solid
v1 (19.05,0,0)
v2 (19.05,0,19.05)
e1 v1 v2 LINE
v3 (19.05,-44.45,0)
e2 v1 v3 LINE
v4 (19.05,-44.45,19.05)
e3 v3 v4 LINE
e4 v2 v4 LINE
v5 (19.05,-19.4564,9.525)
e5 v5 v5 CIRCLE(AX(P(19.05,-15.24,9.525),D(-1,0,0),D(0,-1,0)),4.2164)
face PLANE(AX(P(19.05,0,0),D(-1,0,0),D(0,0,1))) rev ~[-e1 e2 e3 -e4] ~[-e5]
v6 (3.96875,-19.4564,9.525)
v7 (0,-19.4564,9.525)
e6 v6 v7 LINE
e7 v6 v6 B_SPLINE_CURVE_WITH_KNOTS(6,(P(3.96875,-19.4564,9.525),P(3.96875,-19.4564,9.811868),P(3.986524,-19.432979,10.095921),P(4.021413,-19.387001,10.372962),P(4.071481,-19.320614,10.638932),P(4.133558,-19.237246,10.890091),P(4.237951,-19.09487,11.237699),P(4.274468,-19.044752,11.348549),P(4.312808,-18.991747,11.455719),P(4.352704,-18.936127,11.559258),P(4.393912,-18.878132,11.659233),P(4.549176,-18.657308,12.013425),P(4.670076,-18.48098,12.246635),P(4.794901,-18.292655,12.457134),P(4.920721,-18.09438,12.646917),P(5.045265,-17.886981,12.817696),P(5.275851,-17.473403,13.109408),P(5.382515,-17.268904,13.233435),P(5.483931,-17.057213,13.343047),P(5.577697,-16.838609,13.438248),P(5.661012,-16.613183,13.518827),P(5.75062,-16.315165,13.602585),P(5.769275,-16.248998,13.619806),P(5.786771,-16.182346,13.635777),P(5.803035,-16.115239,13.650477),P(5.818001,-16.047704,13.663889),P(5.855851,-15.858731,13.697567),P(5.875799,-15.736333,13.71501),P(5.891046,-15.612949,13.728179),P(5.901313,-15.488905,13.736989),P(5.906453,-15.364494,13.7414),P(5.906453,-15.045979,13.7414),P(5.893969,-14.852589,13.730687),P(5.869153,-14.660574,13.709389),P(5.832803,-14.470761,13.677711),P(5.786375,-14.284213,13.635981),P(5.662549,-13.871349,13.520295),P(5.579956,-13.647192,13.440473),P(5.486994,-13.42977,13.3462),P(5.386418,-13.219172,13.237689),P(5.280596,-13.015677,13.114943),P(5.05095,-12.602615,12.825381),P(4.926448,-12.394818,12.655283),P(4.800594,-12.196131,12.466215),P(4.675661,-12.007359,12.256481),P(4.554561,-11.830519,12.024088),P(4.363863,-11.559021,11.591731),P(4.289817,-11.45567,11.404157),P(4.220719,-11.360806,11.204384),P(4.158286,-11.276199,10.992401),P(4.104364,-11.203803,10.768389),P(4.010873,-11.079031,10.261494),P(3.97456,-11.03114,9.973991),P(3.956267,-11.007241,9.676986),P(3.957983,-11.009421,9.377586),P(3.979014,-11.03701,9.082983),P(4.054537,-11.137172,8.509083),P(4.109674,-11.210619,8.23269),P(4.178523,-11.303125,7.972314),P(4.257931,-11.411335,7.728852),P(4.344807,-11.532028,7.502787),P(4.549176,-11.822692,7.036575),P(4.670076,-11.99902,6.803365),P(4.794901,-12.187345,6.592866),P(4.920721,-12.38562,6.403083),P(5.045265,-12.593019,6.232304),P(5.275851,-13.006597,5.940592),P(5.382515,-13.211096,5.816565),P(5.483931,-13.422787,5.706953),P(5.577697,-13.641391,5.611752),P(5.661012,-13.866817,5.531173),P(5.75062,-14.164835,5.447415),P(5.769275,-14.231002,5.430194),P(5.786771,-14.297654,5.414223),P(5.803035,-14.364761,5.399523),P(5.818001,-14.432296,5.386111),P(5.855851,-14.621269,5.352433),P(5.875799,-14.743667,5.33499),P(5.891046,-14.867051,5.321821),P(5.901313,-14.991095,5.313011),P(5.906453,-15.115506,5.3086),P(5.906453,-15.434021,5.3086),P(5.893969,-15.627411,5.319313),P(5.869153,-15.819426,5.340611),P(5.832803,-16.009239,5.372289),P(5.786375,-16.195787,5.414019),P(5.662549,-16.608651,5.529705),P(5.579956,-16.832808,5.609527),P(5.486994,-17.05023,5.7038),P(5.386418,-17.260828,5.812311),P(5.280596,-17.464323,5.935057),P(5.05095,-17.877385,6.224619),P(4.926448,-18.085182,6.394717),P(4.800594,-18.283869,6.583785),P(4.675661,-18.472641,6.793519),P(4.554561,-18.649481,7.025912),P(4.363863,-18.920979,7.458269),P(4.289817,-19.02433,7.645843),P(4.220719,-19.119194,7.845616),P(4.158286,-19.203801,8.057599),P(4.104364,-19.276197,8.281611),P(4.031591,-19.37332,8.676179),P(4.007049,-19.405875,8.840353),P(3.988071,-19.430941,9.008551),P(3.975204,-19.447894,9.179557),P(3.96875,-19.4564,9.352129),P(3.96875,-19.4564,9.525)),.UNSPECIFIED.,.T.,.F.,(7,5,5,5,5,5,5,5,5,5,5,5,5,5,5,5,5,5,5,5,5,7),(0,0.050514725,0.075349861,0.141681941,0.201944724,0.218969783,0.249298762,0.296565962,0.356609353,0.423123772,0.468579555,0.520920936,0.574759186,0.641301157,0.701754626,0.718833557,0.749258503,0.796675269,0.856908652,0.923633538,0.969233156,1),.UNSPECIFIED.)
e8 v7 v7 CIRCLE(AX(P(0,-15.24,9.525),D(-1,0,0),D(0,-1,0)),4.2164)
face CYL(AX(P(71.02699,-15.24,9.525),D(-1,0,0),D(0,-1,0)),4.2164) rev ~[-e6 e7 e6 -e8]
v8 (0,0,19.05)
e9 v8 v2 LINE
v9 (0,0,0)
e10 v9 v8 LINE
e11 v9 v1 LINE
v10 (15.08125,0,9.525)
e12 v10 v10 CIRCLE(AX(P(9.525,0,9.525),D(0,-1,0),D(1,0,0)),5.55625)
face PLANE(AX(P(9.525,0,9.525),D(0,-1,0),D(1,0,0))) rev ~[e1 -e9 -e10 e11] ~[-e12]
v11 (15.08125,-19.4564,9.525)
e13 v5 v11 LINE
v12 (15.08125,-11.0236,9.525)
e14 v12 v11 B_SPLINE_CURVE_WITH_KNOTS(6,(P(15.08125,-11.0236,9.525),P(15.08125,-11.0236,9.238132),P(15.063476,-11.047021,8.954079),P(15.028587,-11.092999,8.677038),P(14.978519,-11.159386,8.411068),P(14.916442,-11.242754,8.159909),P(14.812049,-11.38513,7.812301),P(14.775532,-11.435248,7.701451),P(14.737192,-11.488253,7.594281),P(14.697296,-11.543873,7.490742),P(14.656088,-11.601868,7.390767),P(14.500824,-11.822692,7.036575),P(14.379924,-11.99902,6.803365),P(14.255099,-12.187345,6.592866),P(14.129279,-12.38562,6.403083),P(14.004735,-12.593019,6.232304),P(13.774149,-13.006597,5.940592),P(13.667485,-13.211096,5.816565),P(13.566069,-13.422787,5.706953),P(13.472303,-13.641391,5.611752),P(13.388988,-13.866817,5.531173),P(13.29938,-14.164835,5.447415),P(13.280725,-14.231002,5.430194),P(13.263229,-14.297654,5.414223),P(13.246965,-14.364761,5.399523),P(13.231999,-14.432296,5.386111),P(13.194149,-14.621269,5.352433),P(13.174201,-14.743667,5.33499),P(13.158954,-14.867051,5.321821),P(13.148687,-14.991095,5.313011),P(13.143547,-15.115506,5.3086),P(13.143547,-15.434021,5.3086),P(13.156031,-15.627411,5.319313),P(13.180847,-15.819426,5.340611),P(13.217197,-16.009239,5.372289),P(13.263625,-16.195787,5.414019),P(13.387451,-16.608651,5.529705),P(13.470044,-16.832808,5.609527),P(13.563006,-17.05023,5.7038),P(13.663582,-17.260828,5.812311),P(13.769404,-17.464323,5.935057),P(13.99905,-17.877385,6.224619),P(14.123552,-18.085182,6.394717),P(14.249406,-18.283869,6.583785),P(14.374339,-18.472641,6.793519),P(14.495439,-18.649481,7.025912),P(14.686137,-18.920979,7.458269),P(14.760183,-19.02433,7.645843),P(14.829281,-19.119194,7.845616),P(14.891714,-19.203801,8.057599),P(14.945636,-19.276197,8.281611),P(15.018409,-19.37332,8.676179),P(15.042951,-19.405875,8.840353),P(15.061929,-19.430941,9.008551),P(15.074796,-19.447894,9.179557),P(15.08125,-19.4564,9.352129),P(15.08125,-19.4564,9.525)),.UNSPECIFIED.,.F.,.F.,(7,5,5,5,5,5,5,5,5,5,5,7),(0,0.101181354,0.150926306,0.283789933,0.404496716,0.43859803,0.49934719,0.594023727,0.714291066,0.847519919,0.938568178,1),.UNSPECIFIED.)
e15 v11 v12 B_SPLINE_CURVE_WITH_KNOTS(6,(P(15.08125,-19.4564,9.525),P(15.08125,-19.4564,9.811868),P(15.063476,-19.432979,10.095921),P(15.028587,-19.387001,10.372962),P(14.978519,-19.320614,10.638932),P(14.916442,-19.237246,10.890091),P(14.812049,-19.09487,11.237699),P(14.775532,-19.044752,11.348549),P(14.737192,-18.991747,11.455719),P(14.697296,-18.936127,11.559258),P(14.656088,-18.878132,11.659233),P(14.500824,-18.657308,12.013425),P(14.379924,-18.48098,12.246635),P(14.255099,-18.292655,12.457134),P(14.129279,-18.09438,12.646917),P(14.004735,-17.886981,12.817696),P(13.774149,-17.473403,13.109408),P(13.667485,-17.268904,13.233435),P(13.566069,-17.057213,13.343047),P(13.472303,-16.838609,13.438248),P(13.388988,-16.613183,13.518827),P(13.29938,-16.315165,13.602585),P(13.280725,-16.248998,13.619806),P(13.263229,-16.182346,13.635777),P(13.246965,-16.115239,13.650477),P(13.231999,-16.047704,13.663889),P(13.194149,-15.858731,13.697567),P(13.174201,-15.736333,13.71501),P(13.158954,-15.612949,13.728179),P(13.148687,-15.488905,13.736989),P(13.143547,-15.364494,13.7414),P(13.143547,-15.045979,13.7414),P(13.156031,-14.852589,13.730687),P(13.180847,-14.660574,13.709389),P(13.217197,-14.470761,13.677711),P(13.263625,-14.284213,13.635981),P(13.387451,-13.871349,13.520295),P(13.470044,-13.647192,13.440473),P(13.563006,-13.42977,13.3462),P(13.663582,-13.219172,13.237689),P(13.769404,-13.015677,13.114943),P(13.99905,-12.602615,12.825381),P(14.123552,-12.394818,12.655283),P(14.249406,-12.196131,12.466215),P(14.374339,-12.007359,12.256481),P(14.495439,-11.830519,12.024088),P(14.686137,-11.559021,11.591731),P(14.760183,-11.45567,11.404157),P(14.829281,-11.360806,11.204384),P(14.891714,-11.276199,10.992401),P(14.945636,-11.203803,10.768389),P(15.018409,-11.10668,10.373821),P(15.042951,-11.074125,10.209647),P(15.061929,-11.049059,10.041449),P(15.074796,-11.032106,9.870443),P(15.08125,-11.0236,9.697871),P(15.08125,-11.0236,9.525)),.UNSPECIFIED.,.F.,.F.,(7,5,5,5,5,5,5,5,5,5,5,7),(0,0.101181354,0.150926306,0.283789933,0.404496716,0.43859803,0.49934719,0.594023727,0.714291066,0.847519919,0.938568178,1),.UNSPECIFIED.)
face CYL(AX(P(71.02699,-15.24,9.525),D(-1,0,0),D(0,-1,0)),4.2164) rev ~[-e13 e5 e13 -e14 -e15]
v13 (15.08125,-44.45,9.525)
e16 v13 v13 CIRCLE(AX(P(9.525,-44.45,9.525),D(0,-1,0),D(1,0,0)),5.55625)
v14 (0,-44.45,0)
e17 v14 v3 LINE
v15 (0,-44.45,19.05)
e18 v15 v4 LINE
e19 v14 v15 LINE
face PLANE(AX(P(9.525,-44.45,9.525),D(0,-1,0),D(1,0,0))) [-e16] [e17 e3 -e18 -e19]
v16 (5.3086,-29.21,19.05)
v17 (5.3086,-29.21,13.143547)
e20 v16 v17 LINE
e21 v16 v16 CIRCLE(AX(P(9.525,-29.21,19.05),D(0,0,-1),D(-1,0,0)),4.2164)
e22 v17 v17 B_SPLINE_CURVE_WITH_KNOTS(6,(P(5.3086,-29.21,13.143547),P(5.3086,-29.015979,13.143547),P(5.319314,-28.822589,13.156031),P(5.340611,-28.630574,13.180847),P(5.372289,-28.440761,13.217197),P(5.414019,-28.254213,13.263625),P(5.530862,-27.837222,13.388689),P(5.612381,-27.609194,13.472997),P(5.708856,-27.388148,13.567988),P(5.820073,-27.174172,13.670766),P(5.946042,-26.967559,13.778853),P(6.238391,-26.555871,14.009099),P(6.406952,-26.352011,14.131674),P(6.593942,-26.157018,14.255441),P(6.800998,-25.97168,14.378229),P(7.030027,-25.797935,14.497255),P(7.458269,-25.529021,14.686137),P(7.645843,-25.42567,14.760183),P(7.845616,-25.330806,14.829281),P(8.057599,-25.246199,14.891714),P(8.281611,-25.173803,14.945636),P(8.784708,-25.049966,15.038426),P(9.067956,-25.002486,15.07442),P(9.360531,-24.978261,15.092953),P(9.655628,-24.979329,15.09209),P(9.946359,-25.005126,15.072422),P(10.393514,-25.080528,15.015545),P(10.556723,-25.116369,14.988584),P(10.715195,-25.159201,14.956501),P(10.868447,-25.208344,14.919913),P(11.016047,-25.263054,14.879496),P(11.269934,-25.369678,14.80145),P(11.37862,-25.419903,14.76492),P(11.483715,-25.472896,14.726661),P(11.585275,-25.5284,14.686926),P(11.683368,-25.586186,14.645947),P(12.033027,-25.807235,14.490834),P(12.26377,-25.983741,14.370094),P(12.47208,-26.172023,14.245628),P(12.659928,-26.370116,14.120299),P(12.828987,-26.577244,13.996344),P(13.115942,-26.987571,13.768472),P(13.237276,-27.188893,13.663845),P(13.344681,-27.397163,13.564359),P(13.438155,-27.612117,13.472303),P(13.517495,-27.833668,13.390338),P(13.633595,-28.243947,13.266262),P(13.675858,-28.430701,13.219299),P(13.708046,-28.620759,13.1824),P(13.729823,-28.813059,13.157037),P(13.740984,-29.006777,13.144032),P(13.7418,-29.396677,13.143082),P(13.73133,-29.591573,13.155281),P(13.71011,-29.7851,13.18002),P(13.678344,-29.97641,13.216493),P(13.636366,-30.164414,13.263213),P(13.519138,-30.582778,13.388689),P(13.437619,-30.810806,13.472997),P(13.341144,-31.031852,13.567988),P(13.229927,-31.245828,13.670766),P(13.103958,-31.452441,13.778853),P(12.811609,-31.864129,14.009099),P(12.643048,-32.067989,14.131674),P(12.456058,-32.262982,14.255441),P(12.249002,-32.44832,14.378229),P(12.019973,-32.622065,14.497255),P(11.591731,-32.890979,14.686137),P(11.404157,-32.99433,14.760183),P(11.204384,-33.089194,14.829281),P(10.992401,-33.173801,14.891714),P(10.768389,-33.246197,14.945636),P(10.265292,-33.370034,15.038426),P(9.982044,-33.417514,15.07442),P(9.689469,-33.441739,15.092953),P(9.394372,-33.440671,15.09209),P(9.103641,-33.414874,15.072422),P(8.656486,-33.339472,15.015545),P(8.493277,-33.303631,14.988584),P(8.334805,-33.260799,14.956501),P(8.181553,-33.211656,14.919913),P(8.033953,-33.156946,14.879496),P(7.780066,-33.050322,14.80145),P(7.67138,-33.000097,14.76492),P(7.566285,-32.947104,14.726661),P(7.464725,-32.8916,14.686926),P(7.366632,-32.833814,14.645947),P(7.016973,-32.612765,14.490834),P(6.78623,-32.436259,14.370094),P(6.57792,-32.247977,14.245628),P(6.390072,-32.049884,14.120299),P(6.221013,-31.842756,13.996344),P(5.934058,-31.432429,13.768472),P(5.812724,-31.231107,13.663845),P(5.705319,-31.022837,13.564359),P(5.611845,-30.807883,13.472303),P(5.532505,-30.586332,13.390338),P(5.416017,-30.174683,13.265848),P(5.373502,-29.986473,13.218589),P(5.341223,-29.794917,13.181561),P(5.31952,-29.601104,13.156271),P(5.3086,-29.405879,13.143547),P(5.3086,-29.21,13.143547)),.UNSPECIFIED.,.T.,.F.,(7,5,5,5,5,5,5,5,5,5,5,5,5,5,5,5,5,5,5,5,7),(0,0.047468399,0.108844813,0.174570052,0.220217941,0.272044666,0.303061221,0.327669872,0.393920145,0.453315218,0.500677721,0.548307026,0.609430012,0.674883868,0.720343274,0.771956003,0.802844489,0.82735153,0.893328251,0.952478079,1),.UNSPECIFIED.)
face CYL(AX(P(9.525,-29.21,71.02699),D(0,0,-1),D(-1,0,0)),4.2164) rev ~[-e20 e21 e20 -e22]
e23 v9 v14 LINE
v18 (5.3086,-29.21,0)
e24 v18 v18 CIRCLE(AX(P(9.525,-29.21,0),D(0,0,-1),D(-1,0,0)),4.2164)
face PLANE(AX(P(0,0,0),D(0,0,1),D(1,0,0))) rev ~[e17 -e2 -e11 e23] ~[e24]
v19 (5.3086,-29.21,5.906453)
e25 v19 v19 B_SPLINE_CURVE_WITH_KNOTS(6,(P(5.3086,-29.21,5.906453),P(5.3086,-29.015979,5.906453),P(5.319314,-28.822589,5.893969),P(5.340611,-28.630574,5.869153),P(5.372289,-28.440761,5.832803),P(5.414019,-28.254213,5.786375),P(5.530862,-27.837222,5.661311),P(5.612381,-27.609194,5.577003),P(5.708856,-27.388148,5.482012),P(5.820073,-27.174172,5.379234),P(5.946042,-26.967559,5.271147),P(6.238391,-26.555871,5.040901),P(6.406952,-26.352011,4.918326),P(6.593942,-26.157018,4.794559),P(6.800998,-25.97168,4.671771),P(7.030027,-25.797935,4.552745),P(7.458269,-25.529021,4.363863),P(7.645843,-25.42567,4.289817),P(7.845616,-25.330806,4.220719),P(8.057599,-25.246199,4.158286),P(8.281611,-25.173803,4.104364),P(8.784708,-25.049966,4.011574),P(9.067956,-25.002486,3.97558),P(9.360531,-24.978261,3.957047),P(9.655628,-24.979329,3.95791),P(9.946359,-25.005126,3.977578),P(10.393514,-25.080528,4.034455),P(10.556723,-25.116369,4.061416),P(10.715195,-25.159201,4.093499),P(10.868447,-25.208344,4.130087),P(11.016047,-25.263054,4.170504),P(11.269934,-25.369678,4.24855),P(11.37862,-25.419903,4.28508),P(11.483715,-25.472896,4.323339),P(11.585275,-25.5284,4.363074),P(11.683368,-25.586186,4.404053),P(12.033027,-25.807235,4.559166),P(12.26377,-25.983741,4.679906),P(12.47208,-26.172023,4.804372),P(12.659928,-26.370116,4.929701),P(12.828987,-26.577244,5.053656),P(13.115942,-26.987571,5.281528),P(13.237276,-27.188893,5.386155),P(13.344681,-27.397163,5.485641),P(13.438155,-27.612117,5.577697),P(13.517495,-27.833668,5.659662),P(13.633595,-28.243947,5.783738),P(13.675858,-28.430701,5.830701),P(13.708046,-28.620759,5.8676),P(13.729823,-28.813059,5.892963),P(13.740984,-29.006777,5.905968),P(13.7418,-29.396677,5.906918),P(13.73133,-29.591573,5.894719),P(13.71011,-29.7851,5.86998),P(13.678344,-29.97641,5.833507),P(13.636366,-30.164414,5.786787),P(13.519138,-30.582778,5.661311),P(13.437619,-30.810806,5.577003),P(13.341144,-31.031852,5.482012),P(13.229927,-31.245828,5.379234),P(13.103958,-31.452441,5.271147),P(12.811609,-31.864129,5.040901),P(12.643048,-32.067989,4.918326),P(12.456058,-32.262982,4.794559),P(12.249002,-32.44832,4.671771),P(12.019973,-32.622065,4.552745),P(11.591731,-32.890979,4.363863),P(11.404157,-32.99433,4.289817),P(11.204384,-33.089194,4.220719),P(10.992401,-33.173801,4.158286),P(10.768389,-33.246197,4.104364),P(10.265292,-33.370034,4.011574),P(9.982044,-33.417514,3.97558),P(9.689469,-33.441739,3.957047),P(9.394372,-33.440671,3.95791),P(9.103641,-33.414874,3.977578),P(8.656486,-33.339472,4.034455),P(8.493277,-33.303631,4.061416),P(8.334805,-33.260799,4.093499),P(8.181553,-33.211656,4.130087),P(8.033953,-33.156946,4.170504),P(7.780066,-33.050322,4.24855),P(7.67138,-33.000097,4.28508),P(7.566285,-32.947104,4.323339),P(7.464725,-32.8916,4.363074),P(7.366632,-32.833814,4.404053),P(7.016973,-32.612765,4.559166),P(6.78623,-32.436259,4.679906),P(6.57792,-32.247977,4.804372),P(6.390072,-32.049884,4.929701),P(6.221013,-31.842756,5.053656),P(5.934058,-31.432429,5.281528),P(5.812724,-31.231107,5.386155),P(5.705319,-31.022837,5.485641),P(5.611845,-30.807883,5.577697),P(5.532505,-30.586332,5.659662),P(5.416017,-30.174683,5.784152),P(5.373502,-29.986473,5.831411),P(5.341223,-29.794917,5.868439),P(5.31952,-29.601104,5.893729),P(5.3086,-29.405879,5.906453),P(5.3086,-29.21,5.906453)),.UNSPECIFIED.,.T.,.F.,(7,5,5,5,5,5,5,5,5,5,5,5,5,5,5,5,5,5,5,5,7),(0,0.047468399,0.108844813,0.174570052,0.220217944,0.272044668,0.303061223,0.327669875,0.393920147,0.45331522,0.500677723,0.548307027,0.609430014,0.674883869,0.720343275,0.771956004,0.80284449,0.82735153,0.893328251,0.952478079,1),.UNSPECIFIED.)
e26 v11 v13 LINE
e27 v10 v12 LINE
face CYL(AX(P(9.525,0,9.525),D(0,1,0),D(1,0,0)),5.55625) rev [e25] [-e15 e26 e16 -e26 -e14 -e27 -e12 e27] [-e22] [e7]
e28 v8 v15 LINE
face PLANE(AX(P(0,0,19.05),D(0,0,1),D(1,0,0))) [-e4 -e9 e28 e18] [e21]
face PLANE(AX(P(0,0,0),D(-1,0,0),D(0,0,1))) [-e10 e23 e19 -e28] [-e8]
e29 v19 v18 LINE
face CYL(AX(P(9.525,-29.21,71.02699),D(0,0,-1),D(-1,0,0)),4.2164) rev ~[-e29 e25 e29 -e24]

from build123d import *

# Parameters (mm, degrees)
F0_W     = 19.05
F0_H     = 19.05
F0_R     = 5.55625
F1_DEPTH = 44.45
F3_D     = 8.4328
F5_D     = 8.4328


# Not quite as in the source:
# - a feature names something its author has since deleted; it is built from what else it names


with BuildPart() as f1:
    # F0 (on Front) → F1 (new body)
    with BuildSketch(Plane.XZ):
        with Locations((9.525, 9.525)):
            Rectangle(F0_W, F0_H)
        with Locations((9.525, 9.525)):
            Circle(F0_R, mode=Mode.SUBTRACT)
    extrude(amount=F1_DEPTH)

    # F3 (through all)
    with Locations(Plane.XY.offset(19.05)):
        with Locations((9.525, -29.21)):
            Hole(F3_D / 2)

    # F5 (through all)
    with Locations(Plane.YZ.offset(19.05)):
        with Locations((-15.24, 9.525)):
            Hole(F5_D / 2)


solid = f1.part
